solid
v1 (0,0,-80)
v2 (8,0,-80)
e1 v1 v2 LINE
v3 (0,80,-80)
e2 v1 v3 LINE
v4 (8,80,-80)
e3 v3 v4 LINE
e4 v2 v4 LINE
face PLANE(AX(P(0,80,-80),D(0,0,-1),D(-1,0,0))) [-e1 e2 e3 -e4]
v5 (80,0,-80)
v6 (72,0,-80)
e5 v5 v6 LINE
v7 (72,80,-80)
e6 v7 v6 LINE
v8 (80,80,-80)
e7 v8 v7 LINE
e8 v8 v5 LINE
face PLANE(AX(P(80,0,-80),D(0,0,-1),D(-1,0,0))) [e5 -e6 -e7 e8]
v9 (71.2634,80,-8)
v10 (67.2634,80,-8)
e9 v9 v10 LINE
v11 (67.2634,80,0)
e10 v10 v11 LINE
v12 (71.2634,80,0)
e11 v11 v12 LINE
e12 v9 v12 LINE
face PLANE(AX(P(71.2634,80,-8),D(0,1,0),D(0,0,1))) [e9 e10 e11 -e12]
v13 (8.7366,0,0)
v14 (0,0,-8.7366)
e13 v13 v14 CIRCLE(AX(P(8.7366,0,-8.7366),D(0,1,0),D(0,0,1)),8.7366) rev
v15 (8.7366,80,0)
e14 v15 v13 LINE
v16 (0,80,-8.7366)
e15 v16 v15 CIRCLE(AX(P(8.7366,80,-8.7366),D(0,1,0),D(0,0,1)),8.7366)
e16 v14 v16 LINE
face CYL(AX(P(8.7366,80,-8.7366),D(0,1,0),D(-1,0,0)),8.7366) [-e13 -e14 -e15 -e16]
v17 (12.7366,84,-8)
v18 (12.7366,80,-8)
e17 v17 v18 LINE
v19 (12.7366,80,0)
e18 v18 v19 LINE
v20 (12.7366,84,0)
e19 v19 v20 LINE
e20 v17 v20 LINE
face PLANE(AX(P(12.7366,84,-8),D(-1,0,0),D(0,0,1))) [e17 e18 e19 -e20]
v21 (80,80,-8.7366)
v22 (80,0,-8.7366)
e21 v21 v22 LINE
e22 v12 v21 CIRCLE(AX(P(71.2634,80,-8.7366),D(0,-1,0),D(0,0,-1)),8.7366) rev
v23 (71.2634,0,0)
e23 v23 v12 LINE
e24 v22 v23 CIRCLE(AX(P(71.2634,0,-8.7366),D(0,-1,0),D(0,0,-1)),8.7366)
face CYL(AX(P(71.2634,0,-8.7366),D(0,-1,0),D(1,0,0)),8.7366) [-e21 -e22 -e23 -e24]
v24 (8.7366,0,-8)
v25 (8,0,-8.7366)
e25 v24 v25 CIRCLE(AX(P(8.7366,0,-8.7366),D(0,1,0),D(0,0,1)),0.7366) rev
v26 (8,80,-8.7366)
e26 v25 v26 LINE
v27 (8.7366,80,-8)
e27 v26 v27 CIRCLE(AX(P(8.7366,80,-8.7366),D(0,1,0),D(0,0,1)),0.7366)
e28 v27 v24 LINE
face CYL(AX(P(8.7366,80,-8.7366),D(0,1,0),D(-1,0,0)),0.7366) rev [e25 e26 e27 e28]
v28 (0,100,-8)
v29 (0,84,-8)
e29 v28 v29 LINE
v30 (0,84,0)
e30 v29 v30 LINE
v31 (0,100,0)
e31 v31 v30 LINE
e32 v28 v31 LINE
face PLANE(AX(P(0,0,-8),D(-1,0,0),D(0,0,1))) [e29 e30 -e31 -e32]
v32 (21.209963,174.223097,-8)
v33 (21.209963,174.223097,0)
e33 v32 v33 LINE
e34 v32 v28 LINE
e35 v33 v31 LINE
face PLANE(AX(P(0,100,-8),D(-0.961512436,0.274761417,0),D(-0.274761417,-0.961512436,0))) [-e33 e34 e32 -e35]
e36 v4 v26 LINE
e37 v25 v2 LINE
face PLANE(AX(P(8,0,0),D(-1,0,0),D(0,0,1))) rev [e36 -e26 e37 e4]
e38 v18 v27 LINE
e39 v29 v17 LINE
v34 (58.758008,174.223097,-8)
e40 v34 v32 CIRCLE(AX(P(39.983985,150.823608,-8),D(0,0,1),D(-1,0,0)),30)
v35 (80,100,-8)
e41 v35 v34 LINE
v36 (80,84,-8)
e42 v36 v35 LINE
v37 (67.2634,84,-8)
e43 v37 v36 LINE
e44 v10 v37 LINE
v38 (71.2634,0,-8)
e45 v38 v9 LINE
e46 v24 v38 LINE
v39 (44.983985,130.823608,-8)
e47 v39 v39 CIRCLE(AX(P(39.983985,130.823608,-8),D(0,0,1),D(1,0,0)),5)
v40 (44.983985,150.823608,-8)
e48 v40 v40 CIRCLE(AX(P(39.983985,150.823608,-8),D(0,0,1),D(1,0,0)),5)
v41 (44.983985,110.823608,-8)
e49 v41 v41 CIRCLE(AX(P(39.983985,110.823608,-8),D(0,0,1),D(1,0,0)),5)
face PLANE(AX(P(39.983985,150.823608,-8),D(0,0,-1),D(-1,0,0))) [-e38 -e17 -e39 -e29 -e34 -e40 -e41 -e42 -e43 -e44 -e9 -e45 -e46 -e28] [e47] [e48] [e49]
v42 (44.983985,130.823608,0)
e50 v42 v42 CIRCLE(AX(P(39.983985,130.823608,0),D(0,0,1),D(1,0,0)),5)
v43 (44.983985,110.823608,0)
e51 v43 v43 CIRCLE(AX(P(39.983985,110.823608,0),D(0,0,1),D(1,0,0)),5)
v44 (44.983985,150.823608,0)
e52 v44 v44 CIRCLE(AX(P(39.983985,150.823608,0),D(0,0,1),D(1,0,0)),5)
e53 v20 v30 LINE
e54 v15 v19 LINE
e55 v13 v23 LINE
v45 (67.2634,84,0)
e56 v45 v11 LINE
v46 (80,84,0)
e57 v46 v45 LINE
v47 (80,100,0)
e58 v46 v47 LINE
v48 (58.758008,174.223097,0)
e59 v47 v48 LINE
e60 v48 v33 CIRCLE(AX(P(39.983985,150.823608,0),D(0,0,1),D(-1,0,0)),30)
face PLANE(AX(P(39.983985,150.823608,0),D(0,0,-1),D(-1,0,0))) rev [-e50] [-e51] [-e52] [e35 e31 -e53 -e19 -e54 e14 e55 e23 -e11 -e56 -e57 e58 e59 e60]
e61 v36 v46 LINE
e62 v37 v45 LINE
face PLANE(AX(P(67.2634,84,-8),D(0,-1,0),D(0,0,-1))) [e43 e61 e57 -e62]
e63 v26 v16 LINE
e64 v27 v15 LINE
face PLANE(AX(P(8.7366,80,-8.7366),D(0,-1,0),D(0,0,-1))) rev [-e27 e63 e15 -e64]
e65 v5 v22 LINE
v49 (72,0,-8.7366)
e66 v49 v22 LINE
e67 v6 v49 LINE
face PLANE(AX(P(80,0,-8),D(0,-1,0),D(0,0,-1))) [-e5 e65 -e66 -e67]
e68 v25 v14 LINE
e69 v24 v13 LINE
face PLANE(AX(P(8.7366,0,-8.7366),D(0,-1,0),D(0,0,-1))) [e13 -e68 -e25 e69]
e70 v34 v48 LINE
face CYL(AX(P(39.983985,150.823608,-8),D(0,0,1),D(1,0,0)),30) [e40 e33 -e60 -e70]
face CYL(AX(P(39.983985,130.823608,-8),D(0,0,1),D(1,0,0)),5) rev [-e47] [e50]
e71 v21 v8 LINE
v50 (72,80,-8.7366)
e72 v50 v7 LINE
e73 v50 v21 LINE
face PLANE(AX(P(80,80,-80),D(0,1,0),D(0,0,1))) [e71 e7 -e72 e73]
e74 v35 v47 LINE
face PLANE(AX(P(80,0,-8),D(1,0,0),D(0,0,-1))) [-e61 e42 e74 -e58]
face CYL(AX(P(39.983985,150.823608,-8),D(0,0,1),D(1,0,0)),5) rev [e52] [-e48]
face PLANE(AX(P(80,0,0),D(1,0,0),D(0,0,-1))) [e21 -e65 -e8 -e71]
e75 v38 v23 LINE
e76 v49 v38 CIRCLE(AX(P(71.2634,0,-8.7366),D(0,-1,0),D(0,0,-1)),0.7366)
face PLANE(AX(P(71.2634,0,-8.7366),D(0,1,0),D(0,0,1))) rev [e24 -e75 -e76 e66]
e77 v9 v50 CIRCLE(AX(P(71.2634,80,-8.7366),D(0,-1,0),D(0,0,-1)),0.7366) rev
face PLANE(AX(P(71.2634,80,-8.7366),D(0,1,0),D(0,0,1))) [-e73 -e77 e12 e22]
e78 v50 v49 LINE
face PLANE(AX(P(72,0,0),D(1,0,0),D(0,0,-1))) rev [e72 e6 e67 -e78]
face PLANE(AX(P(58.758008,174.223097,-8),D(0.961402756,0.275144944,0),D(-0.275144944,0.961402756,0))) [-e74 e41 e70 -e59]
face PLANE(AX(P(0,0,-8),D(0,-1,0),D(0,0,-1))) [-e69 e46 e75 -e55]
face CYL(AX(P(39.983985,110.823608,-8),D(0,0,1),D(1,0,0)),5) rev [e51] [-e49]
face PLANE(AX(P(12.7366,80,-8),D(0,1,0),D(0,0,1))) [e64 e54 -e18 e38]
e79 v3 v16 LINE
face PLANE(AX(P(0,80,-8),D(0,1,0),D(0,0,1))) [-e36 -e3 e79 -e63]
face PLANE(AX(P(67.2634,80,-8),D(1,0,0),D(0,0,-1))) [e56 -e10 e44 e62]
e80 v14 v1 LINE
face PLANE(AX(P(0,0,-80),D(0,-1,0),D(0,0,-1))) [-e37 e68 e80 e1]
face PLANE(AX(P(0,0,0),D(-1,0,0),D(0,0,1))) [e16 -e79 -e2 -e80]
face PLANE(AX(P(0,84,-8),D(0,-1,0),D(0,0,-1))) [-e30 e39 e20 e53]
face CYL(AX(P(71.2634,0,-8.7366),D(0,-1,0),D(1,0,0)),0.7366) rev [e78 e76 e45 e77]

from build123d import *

# Parameters (mm, degrees)
SKETCH_1_R                         = 5
SM_BASE_FLANGE_2_DEPTH             = 8
SM_EDGE_FLANGE_10_STRIP_W          = 33.4732
SM_EDGE_FLANGE_10_STRIP_H          = 8
SM_EDGE_FLANGE_10_STRIP_CUT_DEPTH  = 80
SM_EDGE_FLANGE_10_RELIEF_W         = 37.4732
SM_EDGE_FLANGE_10_RELIEF_H         = 4
SM_EDGE_FLANGE_10_RELIEF_CUT_DEPTH = 8
SM_EDGE_FLANGE_10_DEPTH            = 80
SM_EDGE_FLANGE_12_STRIP_W          = 33.4732
SM_EDGE_FLANGE_12_STRIP_H          = 8
SM_EDGE_FLANGE_12_STRIP_CUT_DEPTH  = 80
SM_EDGE_FLANGE_12_RELIEF_W         = 37.4732
SM_EDGE_FLANGE_12_RELIEF_H         = 4
SM_EDGE_FLANGE_12_RELIEF_CUT_DEPTH = 8
SM_EDGE_FLANGE_12_DEPTH            = 80


# Sheet-metal steps are written as plain solids
with BuildPart() as part:
    # 草图1 → 基体-法兰2 (new body)
    with BuildSketch(Plane.XY):
        with BuildLine():
            Line((0, 0), (80, 0))
            Line((80, 0), (80, 100))
            Line((80, 100), (58.758007847, 174.223096705))
            ThreePointArc((58.758007847, 174.223096705), (39.983985428, 180.823607775), (21.209963009, 174.223096705))
            Line((21.209963009, 174.223096705), (0, 100))
            Line((0, 100), (0, 0))
        make_face()
        with Locations((39.983985428, 150.823607775)):
            Circle(SKETCH_1_R, mode=Mode.SUBTRACT)
        with Locations((39.983985428, 130.823607775)):
            Circle(SKETCH_1_R, mode=Mode.SUBTRACT)
        with Locations((39.983985428, 110.823607775)):
            Circle(SKETCH_1_R, mode=Mode.SUBTRACT)
    extrude(amount=-SM_BASE_FLANGE_2_DEPTH)

    # 边线-法兰10 strip (across the edge) → 边线-法兰10 strip cut (cut)
    with BuildSketch(Plane(origin=(80, 80, -8), x_dir=(-1, 0, 0), z_dir=(0, -1, 0))):
        with Locations((-8, -4)):
            Rectangle(SM_EDGE_FLANGE_10_STRIP_W, SM_EDGE_FLANGE_10_STRIP_H)
    extrude(amount=SM_EDGE_FLANGE_10_STRIP_CUT_DEPTH, mode=Mode.SUBTRACT)

    # 边线-法兰10 relief (on the sheet) → 边线-法兰10 relief cut (cut)
    with BuildSketch(Plane(origin=(71.2634, 80, -8), x_dir=(-1, 0, 0), z_dir=(0, 0, -1))):
        with Locations((-14.7366, 2)):
            Rectangle(SM_EDGE_FLANGE_10_RELIEF_W, SM_EDGE_FLANGE_10_RELIEF_H)
    extrude(amount=-SM_EDGE_FLANGE_10_RELIEF_CUT_DEPTH, mode=Mode.SUBTRACT)

    # 边线-法兰10 section (across the edge) → 边线-法兰10 (add)
    with BuildSketch(Plane(origin=(80, 80, -8), x_dir=(-1, 0, 0), z_dir=(0, -1, 0))):
        with BuildLine():
            Line((0, 0.7366), (0, 72))
            Line((0, 72), (8, 72))
            Line((8, 72), (8, 0.7366))
            ThreePointArc((8, 0.7366), (8.215745145, 0.215745145), (8.7366, 0))
            Line((8.7366, 0), (8.7366, -8))
            ThreePointArc((8.7366, -8), (2.558890895, -5.441109105), (0, 0.7366))
        make_face()
    extrude(amount=SM_EDGE_FLANGE_10_DEPTH)

    # 边线-法兰12 strip (across the edge) → 边线-法兰12 strip cut (cut)
    with BuildSketch(Plane(origin=(0, 0, -8), x_dir=(1, 0, 0), z_dir=(0, 1, 0))):
        with Locations((-8, -4)):
            Rectangle(SM_EDGE_FLANGE_12_STRIP_W, SM_EDGE_FLANGE_12_STRIP_H)
    extrude(amount=SM_EDGE_FLANGE_12_STRIP_CUT_DEPTH, mode=Mode.SUBTRACT)

    # 边线-法兰12 relief (on the sheet) → 边线-法兰12 relief cut (cut)
    with BuildSketch(Plane(origin=(8.7366, 0, -8), x_dir=(1, 0, 0), z_dir=(0, 0, -1))):
        with Locations((-14.7366, -82)):
            Rectangle(SM_EDGE_FLANGE_12_RELIEF_W, SM_EDGE_FLANGE_12_RELIEF_H)
    extrude(amount=-SM_EDGE_FLANGE_12_RELIEF_CUT_DEPTH, mode=Mode.SUBTRACT)

    # 边线-法兰12 section (across the edge) → 边线-法兰12 (add)
    with BuildSketch(Plane(origin=(0, 0, -8), x_dir=(1, 0, 0), z_dir=(0, 1, 0))):
        with BuildLine():
            Line((0, 0.7366), (0, 72))
            Line((0, 72), (8, 72))
            Line((8, 72), (8, 0.7366))
            ThreePointArc((8, 0.7366), (8.215745145, 0.215745145), (8.7366, 0))
            Line((8.7366, 0), (8.7366, -8))
            ThreePointArc((8.7366, -8), (2.558890895, -5.441109105), (0, 0.7366))
        make_face()
    extrude(amount=SM_EDGE_FLANGE_12_DEPTH)


solid = part.part
